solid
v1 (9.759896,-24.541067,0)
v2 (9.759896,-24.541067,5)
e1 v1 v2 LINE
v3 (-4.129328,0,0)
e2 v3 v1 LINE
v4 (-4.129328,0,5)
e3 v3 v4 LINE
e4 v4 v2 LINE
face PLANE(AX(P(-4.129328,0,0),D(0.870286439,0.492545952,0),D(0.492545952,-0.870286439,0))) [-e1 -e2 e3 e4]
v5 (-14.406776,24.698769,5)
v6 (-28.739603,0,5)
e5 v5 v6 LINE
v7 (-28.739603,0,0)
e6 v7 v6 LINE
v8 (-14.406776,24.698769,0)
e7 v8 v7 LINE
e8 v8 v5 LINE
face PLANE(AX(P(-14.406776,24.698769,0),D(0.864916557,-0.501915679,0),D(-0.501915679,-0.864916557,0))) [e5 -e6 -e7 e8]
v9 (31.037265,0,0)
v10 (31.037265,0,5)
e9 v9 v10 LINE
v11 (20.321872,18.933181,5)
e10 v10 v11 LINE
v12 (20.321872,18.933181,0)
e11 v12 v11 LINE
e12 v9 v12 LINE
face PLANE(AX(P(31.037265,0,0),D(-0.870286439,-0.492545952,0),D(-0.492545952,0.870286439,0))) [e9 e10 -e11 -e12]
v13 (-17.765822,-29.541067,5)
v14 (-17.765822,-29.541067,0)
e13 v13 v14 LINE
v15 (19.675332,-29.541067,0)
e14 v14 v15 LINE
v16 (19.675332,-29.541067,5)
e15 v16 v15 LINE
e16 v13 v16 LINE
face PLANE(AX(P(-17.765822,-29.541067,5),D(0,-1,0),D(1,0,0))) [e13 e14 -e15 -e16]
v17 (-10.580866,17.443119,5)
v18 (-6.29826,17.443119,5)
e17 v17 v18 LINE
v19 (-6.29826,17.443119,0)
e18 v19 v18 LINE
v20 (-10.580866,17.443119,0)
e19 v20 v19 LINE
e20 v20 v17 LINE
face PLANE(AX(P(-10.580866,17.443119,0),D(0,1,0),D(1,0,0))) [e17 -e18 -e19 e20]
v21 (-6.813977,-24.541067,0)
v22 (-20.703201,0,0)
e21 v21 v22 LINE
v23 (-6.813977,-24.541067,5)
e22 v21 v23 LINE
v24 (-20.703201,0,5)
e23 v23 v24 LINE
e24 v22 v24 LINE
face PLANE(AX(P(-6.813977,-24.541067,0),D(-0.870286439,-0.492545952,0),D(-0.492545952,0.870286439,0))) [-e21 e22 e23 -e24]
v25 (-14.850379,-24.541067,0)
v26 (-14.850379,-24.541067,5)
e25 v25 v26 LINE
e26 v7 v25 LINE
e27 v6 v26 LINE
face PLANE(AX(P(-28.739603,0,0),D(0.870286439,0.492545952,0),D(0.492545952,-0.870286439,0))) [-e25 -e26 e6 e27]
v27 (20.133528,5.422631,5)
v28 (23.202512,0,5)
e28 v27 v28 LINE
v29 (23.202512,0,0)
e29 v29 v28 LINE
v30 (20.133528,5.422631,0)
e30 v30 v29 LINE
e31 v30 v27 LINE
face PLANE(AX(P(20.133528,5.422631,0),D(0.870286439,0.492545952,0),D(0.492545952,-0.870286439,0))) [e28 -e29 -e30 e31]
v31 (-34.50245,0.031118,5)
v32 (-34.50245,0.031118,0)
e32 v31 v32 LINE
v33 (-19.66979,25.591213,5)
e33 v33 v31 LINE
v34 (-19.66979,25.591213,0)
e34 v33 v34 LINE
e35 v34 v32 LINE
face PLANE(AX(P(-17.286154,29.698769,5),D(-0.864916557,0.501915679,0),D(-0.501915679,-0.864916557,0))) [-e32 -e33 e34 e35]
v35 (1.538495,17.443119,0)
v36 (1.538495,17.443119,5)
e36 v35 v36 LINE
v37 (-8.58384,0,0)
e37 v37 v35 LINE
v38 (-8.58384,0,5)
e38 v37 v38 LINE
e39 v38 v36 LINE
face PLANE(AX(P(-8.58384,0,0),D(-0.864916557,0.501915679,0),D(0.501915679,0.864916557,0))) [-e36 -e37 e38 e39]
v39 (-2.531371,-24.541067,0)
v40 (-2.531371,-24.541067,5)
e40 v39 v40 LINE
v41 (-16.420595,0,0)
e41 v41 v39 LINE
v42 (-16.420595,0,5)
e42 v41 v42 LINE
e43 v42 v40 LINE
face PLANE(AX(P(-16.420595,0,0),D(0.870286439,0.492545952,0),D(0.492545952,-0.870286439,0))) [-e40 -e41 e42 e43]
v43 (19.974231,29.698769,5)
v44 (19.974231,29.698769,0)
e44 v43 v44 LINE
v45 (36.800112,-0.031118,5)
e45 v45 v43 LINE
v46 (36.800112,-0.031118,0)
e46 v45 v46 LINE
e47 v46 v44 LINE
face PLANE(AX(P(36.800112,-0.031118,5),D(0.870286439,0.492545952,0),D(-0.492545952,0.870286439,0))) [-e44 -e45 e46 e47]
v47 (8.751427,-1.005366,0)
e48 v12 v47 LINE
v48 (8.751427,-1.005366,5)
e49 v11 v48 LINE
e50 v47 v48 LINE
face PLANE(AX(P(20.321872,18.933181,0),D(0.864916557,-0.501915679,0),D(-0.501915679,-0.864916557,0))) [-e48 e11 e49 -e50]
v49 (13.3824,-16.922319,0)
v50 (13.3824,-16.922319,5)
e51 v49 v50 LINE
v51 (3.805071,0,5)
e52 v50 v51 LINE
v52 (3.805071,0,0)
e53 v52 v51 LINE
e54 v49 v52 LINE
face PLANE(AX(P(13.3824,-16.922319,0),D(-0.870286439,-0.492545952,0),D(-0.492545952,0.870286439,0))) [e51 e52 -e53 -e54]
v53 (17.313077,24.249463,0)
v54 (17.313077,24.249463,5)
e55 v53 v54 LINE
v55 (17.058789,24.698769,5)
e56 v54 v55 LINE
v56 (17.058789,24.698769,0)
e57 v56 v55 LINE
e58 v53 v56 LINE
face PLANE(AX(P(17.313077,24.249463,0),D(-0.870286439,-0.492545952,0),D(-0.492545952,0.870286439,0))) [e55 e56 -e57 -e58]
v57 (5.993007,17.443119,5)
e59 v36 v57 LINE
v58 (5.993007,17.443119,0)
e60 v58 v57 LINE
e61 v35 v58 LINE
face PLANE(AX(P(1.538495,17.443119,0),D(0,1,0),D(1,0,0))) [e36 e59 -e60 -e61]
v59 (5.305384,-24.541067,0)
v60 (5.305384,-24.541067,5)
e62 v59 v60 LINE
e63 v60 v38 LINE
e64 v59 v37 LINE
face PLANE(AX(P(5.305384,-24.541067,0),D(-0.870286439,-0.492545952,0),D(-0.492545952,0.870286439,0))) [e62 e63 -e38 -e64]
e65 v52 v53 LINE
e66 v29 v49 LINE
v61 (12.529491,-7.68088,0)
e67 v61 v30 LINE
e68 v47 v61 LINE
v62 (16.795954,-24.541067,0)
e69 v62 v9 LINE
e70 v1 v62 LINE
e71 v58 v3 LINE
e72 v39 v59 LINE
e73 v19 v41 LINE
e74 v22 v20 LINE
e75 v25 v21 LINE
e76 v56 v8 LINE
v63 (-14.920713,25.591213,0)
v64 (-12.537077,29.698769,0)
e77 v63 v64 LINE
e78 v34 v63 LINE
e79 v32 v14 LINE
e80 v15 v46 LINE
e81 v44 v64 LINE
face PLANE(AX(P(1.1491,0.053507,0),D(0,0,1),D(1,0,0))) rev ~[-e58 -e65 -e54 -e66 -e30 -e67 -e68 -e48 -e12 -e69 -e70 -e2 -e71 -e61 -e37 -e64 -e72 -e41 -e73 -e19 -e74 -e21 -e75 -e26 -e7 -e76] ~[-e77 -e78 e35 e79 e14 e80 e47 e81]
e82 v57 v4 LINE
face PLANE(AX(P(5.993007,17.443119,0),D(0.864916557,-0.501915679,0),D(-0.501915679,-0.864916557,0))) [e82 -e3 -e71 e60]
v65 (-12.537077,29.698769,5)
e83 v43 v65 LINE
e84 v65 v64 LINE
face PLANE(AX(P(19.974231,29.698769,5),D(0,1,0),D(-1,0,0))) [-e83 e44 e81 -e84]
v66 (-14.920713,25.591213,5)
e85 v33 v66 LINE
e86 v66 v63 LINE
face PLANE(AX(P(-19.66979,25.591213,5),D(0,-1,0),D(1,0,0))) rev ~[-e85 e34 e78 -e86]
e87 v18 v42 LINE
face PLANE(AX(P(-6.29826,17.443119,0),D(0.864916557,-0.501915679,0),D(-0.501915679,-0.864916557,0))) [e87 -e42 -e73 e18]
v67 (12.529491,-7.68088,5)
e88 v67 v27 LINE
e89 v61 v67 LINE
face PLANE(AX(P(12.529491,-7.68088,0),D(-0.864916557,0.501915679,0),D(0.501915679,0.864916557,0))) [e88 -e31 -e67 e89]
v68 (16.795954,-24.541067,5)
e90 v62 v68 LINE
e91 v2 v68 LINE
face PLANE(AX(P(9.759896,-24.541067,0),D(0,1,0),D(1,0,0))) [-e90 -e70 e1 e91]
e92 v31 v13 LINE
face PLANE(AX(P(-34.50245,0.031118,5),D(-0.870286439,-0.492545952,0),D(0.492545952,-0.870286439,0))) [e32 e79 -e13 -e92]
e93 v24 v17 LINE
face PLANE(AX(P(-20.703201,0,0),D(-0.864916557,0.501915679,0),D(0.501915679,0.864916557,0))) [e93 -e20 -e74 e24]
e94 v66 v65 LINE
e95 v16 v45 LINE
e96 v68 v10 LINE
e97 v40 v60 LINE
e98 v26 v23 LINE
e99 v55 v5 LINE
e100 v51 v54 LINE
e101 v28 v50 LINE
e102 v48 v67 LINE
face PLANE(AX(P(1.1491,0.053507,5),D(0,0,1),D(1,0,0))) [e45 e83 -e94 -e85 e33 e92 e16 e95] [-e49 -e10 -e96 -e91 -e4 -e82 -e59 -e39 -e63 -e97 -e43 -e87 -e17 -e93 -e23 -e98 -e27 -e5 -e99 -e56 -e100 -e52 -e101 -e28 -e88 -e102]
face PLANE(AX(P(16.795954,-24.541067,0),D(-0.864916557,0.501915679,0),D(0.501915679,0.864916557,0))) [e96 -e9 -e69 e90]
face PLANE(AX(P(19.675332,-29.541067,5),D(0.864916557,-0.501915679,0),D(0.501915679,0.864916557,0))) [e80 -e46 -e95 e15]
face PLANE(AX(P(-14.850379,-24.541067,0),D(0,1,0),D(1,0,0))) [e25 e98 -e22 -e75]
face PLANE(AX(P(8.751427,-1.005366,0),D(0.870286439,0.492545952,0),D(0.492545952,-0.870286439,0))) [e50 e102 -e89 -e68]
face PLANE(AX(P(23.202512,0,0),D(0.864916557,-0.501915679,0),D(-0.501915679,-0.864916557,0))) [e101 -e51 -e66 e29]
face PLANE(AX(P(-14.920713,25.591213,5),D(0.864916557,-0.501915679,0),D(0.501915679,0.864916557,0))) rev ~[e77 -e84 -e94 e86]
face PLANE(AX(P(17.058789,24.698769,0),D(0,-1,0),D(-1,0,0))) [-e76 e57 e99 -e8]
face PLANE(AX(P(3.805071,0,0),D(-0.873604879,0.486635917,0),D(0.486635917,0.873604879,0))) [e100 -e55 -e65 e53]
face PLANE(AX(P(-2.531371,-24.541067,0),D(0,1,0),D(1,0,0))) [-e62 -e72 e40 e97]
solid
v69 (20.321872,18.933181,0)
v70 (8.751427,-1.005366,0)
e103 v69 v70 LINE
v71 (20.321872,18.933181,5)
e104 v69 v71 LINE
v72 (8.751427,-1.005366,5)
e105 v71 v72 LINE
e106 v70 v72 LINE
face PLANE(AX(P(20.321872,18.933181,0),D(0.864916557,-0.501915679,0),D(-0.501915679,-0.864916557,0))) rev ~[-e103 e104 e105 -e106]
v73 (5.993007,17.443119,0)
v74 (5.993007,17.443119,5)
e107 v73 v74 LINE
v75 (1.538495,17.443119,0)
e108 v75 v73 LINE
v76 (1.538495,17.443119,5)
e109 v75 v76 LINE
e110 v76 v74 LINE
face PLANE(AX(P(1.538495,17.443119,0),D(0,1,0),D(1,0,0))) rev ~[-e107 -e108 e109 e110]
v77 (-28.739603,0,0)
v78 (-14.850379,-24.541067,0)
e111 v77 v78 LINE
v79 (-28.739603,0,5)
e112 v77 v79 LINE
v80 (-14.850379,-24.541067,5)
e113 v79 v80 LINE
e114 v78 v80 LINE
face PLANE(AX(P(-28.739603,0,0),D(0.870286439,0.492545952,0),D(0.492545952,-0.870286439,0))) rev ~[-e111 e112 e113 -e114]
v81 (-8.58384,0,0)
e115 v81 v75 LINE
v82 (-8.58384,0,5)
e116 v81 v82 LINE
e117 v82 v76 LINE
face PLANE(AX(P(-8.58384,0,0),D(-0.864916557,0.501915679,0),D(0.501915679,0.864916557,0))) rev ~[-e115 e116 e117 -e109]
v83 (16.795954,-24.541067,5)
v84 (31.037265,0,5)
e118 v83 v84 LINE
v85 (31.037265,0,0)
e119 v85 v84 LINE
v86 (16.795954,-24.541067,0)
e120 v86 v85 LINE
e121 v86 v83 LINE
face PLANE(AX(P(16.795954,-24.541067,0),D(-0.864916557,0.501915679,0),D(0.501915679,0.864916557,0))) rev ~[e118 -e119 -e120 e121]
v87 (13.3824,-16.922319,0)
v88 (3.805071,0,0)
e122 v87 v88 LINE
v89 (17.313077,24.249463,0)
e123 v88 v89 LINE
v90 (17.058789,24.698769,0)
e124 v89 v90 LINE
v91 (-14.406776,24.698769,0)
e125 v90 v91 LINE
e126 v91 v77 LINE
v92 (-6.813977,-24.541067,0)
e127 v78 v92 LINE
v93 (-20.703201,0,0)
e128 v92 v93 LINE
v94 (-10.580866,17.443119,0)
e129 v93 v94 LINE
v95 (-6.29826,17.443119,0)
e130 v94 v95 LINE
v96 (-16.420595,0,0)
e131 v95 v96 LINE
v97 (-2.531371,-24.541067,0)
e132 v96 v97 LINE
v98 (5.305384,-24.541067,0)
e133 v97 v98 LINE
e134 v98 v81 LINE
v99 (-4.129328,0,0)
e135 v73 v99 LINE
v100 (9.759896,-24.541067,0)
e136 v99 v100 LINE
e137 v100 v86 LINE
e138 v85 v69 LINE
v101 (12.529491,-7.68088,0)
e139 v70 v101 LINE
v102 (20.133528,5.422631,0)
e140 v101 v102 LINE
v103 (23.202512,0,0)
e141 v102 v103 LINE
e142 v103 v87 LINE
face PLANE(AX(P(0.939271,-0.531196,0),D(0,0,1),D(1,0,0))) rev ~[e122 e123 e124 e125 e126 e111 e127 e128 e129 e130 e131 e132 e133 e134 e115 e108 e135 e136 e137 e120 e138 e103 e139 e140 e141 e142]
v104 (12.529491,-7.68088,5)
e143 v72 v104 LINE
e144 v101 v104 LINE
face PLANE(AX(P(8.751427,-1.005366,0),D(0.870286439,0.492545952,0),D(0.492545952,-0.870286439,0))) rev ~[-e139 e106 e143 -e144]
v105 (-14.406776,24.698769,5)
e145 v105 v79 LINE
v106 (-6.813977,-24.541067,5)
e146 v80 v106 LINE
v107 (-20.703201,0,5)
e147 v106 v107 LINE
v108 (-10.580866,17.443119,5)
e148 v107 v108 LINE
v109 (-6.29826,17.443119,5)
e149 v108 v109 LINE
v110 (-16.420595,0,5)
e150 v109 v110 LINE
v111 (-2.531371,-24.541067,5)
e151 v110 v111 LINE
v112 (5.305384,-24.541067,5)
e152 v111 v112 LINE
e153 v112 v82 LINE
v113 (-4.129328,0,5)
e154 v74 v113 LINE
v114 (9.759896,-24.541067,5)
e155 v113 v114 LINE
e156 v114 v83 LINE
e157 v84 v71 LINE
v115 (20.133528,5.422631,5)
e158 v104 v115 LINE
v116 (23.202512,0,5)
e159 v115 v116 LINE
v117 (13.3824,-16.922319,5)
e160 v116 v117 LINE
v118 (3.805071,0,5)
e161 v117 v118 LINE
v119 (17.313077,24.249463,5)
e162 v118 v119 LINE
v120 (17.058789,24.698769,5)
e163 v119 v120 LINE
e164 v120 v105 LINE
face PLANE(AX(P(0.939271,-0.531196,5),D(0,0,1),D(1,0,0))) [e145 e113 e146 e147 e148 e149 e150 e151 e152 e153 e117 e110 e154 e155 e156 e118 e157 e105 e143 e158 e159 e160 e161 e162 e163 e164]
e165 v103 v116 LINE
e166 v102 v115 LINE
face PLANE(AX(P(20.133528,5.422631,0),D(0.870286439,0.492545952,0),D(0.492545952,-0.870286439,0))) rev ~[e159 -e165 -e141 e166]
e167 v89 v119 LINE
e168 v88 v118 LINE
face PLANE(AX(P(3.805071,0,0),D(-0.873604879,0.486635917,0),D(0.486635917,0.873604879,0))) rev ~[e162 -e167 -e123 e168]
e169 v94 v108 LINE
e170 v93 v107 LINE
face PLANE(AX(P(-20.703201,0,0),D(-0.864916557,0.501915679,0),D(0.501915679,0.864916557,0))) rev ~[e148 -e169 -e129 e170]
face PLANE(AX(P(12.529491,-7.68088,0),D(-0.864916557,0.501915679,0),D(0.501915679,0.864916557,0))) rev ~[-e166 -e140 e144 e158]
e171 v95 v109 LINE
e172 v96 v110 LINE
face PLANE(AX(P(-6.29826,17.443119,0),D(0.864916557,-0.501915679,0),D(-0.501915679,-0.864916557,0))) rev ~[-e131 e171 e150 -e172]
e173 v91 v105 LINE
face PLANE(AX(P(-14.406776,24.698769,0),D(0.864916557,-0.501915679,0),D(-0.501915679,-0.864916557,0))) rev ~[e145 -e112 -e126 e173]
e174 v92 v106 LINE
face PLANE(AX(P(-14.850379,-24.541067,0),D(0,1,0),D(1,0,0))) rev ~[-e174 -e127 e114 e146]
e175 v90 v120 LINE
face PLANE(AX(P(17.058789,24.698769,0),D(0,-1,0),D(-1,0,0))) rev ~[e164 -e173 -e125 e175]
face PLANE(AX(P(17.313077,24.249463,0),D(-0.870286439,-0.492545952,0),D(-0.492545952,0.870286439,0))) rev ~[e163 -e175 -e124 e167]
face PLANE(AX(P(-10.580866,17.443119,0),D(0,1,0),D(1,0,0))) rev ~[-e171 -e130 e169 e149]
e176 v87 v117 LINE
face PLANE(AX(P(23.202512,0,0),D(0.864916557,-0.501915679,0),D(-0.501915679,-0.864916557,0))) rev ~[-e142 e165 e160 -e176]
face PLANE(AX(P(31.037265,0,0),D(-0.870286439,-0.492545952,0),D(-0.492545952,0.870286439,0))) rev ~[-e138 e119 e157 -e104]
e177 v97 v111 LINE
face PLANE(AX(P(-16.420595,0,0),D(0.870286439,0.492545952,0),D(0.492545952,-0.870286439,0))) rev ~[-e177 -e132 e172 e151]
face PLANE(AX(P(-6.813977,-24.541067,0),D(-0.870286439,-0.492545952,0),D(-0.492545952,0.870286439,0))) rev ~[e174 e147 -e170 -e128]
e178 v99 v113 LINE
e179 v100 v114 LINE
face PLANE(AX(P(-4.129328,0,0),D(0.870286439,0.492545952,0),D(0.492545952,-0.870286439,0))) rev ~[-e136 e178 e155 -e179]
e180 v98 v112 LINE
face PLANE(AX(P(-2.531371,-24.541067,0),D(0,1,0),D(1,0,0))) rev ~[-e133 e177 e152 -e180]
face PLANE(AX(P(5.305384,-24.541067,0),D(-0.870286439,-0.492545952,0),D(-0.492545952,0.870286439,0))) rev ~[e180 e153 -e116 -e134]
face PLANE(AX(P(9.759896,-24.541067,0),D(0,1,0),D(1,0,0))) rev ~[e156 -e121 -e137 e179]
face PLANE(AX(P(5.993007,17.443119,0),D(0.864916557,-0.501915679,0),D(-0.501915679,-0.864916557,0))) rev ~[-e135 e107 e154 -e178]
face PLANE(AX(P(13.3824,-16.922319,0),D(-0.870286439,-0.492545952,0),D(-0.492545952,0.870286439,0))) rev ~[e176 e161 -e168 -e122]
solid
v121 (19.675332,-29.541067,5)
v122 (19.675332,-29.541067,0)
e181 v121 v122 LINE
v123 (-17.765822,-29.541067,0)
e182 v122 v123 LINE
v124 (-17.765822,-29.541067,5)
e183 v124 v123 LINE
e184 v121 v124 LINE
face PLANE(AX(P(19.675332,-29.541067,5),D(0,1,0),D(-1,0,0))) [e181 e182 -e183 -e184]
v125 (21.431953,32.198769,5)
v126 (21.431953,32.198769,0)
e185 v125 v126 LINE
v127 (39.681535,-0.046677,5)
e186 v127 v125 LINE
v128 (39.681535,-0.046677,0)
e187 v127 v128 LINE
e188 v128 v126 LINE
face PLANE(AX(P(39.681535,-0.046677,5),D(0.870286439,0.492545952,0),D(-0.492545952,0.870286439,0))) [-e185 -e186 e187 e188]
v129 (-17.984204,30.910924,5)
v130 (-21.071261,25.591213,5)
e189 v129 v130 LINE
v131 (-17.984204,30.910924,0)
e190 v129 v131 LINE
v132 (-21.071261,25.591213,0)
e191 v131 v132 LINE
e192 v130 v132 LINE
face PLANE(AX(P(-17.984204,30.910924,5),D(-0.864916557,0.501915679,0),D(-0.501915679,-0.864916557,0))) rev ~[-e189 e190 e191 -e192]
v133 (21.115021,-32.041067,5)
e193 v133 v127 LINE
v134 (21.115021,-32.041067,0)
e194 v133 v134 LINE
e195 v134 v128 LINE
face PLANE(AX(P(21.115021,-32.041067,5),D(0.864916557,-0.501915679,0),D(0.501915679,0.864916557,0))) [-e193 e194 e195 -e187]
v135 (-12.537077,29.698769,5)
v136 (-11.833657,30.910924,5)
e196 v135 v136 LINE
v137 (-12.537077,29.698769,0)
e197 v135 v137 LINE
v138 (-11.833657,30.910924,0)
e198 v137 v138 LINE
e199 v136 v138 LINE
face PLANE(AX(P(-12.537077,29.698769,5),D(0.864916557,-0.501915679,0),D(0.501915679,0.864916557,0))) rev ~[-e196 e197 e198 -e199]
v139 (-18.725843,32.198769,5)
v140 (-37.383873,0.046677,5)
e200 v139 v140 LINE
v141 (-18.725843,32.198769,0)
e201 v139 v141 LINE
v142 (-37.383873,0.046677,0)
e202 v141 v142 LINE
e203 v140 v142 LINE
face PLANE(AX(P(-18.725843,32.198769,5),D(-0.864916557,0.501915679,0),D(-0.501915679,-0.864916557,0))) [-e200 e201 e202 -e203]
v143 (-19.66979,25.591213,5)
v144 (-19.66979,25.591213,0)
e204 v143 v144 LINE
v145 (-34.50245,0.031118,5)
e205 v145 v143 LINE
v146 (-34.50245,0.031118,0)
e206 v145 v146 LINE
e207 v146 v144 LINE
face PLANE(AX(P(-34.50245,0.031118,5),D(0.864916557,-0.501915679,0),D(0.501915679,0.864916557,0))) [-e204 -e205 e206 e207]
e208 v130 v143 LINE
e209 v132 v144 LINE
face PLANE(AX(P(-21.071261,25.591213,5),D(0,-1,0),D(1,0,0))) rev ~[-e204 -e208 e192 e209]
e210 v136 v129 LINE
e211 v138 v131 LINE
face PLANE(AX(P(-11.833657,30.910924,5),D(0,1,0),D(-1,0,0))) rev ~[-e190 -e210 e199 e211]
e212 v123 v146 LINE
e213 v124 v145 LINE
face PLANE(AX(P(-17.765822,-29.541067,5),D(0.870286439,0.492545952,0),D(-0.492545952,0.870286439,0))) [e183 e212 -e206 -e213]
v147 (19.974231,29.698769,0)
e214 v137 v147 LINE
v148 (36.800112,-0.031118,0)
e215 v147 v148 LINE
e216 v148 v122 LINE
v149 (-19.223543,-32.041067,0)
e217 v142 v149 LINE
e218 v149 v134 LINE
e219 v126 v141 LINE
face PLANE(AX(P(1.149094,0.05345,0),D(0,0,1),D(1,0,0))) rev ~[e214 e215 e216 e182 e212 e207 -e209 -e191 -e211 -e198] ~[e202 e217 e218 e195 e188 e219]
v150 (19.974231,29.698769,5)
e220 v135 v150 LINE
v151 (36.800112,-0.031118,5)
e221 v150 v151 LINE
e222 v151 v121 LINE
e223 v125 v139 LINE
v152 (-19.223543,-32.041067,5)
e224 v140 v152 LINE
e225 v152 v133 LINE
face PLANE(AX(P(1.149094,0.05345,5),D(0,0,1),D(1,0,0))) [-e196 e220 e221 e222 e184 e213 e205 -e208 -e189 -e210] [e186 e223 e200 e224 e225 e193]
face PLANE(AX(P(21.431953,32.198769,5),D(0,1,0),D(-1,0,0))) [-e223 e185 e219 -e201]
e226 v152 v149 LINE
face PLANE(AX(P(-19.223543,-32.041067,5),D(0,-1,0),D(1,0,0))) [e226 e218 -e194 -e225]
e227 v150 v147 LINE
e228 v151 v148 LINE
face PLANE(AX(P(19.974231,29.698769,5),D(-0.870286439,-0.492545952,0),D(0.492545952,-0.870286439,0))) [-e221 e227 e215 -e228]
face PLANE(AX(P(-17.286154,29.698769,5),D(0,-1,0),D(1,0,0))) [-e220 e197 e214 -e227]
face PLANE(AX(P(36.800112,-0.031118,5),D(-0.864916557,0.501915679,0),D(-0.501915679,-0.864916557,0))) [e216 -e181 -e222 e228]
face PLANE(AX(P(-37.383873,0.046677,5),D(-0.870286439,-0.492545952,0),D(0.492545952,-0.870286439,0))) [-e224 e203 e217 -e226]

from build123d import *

# Parameters (mm, degrees)
F1_DEPTH  = 5
F3_DEPTH  = 5
F6_DEPTH  = 5
F8_DEPTH  = 25
F10_DEPTH = 25


# Not quite as in the source:
# - a feature names something its author has since deleted; it is built from what else it names


with BuildPart() as f1:
    # F0 (on Top) → F1 (new body)
    with BuildSketch(Plane.XY):
        Polygon((9.7598956231, -24.5410669595), (16.7959537357, -24.5410669595), (31.0372654349, 0), (20.3218720853, 18.9331807196), (8.7514274241, -1.0053658961), (12.5294908801, -7.6808798833), (20.1335282104, 5.4226314524), (23.2025122265, 0), (13.3824004213, -16.922319127), (3.8050711538, 0), (17.3130770462, 24.2494634137), (17.0587887483, 24.6987690194), (-14.4067760557, 24.6987690194), (-28.7396030991, 0), (-14.8503792237, -24.5410669595), (-6.8139773794, -24.5410669595), (-20.7032012548, 0), (-10.5808662515, 17.4431194507), (-6.2982602976, 17.4431194507), (-16.4205953009, 0), (-2.5313714255, -24.5410669595), (5.3053838201, -24.5410669595), (-8.5838400553, 0), (1.538494948, 17.4431194507), (5.9930067509, 17.4431194507), (-4.1293282523, 0), align=None)
    extrude(amount=F1_DEPTH)


with BuildPart() as f3:
    # F2 (on face) → F3 (new body)
    with BuildSketch(Plane.XY.offset(5)):
        Polygon((19.9742314443, 29.6987690194), (-17.2861539376, 29.6987690194), (-34.5024495524, 0.0311181456), (-17.7658219197, -29.5410669595), (19.6753316176, -29.5410669595), (36.8001118881, -0.0311181456), align=None)
    extrude(amount=-F3_DEPTH)

    # F4: cut F1
    add(f1.part, mode=Mode.SUBTRACT)

    # F7 (on face) → F8 (cut)
    with BuildSketch(Plane.XY.offset(5)):
        Polygon((-14.9207130098, 25.5912134556), (-12.5370766665, 29.6987690194), (-17.2861539376, 29.6987690194), (-19.6697902808, 25.5912134556), align=None)
    extrude(amount=-F8_DEPTH, mode=Mode.SUBTRACT)


with BuildPart() as f6:
    # F5 (on face) → F6 (new body, through all)
    with BuildSketch(Plane.XY.offset(5)):
        Polygon((21.4319527923, 32.1987690194), (-18.7258428786, 32.1987690194), (-37.383872779, 0.0466772184), (-19.2235432677, -32.0410669595), (21.1150205586, -32.0410669595), (39.6815351148, -0.0466772184), align=None)
        Polygon((-34.5024495524, 0.0311181456), (-17.2861539376, 29.6987690194), (19.9742314443, 29.6987690194), (36.8001118881, -0.0311181456), (19.6753316176, -29.5410669595), (-17.7658219197, -29.5410669595), align=None, mode=Mode.SUBTRACT)
    extrude(amount=-F6_DEPTH)

    # F9 (on face) → F10 (cut)
    with BuildSketch(Plane.XY.offset(5)):
        Polygon((-21.071260795, 25.5912134556), (-19.6697902808, 25.5912134556), (-14.9207130098, 25.5912134556), (-12.5370766665, 29.6987690194), (-11.8336566418, 30.9109240717), (-17.984204427, 30.9109240717), align=None)
    extrude(amount=-F10_DEPTH, mode=Mode.SUBTRACT)


solid = Compound([f1.part, f3.part, f6.part])
